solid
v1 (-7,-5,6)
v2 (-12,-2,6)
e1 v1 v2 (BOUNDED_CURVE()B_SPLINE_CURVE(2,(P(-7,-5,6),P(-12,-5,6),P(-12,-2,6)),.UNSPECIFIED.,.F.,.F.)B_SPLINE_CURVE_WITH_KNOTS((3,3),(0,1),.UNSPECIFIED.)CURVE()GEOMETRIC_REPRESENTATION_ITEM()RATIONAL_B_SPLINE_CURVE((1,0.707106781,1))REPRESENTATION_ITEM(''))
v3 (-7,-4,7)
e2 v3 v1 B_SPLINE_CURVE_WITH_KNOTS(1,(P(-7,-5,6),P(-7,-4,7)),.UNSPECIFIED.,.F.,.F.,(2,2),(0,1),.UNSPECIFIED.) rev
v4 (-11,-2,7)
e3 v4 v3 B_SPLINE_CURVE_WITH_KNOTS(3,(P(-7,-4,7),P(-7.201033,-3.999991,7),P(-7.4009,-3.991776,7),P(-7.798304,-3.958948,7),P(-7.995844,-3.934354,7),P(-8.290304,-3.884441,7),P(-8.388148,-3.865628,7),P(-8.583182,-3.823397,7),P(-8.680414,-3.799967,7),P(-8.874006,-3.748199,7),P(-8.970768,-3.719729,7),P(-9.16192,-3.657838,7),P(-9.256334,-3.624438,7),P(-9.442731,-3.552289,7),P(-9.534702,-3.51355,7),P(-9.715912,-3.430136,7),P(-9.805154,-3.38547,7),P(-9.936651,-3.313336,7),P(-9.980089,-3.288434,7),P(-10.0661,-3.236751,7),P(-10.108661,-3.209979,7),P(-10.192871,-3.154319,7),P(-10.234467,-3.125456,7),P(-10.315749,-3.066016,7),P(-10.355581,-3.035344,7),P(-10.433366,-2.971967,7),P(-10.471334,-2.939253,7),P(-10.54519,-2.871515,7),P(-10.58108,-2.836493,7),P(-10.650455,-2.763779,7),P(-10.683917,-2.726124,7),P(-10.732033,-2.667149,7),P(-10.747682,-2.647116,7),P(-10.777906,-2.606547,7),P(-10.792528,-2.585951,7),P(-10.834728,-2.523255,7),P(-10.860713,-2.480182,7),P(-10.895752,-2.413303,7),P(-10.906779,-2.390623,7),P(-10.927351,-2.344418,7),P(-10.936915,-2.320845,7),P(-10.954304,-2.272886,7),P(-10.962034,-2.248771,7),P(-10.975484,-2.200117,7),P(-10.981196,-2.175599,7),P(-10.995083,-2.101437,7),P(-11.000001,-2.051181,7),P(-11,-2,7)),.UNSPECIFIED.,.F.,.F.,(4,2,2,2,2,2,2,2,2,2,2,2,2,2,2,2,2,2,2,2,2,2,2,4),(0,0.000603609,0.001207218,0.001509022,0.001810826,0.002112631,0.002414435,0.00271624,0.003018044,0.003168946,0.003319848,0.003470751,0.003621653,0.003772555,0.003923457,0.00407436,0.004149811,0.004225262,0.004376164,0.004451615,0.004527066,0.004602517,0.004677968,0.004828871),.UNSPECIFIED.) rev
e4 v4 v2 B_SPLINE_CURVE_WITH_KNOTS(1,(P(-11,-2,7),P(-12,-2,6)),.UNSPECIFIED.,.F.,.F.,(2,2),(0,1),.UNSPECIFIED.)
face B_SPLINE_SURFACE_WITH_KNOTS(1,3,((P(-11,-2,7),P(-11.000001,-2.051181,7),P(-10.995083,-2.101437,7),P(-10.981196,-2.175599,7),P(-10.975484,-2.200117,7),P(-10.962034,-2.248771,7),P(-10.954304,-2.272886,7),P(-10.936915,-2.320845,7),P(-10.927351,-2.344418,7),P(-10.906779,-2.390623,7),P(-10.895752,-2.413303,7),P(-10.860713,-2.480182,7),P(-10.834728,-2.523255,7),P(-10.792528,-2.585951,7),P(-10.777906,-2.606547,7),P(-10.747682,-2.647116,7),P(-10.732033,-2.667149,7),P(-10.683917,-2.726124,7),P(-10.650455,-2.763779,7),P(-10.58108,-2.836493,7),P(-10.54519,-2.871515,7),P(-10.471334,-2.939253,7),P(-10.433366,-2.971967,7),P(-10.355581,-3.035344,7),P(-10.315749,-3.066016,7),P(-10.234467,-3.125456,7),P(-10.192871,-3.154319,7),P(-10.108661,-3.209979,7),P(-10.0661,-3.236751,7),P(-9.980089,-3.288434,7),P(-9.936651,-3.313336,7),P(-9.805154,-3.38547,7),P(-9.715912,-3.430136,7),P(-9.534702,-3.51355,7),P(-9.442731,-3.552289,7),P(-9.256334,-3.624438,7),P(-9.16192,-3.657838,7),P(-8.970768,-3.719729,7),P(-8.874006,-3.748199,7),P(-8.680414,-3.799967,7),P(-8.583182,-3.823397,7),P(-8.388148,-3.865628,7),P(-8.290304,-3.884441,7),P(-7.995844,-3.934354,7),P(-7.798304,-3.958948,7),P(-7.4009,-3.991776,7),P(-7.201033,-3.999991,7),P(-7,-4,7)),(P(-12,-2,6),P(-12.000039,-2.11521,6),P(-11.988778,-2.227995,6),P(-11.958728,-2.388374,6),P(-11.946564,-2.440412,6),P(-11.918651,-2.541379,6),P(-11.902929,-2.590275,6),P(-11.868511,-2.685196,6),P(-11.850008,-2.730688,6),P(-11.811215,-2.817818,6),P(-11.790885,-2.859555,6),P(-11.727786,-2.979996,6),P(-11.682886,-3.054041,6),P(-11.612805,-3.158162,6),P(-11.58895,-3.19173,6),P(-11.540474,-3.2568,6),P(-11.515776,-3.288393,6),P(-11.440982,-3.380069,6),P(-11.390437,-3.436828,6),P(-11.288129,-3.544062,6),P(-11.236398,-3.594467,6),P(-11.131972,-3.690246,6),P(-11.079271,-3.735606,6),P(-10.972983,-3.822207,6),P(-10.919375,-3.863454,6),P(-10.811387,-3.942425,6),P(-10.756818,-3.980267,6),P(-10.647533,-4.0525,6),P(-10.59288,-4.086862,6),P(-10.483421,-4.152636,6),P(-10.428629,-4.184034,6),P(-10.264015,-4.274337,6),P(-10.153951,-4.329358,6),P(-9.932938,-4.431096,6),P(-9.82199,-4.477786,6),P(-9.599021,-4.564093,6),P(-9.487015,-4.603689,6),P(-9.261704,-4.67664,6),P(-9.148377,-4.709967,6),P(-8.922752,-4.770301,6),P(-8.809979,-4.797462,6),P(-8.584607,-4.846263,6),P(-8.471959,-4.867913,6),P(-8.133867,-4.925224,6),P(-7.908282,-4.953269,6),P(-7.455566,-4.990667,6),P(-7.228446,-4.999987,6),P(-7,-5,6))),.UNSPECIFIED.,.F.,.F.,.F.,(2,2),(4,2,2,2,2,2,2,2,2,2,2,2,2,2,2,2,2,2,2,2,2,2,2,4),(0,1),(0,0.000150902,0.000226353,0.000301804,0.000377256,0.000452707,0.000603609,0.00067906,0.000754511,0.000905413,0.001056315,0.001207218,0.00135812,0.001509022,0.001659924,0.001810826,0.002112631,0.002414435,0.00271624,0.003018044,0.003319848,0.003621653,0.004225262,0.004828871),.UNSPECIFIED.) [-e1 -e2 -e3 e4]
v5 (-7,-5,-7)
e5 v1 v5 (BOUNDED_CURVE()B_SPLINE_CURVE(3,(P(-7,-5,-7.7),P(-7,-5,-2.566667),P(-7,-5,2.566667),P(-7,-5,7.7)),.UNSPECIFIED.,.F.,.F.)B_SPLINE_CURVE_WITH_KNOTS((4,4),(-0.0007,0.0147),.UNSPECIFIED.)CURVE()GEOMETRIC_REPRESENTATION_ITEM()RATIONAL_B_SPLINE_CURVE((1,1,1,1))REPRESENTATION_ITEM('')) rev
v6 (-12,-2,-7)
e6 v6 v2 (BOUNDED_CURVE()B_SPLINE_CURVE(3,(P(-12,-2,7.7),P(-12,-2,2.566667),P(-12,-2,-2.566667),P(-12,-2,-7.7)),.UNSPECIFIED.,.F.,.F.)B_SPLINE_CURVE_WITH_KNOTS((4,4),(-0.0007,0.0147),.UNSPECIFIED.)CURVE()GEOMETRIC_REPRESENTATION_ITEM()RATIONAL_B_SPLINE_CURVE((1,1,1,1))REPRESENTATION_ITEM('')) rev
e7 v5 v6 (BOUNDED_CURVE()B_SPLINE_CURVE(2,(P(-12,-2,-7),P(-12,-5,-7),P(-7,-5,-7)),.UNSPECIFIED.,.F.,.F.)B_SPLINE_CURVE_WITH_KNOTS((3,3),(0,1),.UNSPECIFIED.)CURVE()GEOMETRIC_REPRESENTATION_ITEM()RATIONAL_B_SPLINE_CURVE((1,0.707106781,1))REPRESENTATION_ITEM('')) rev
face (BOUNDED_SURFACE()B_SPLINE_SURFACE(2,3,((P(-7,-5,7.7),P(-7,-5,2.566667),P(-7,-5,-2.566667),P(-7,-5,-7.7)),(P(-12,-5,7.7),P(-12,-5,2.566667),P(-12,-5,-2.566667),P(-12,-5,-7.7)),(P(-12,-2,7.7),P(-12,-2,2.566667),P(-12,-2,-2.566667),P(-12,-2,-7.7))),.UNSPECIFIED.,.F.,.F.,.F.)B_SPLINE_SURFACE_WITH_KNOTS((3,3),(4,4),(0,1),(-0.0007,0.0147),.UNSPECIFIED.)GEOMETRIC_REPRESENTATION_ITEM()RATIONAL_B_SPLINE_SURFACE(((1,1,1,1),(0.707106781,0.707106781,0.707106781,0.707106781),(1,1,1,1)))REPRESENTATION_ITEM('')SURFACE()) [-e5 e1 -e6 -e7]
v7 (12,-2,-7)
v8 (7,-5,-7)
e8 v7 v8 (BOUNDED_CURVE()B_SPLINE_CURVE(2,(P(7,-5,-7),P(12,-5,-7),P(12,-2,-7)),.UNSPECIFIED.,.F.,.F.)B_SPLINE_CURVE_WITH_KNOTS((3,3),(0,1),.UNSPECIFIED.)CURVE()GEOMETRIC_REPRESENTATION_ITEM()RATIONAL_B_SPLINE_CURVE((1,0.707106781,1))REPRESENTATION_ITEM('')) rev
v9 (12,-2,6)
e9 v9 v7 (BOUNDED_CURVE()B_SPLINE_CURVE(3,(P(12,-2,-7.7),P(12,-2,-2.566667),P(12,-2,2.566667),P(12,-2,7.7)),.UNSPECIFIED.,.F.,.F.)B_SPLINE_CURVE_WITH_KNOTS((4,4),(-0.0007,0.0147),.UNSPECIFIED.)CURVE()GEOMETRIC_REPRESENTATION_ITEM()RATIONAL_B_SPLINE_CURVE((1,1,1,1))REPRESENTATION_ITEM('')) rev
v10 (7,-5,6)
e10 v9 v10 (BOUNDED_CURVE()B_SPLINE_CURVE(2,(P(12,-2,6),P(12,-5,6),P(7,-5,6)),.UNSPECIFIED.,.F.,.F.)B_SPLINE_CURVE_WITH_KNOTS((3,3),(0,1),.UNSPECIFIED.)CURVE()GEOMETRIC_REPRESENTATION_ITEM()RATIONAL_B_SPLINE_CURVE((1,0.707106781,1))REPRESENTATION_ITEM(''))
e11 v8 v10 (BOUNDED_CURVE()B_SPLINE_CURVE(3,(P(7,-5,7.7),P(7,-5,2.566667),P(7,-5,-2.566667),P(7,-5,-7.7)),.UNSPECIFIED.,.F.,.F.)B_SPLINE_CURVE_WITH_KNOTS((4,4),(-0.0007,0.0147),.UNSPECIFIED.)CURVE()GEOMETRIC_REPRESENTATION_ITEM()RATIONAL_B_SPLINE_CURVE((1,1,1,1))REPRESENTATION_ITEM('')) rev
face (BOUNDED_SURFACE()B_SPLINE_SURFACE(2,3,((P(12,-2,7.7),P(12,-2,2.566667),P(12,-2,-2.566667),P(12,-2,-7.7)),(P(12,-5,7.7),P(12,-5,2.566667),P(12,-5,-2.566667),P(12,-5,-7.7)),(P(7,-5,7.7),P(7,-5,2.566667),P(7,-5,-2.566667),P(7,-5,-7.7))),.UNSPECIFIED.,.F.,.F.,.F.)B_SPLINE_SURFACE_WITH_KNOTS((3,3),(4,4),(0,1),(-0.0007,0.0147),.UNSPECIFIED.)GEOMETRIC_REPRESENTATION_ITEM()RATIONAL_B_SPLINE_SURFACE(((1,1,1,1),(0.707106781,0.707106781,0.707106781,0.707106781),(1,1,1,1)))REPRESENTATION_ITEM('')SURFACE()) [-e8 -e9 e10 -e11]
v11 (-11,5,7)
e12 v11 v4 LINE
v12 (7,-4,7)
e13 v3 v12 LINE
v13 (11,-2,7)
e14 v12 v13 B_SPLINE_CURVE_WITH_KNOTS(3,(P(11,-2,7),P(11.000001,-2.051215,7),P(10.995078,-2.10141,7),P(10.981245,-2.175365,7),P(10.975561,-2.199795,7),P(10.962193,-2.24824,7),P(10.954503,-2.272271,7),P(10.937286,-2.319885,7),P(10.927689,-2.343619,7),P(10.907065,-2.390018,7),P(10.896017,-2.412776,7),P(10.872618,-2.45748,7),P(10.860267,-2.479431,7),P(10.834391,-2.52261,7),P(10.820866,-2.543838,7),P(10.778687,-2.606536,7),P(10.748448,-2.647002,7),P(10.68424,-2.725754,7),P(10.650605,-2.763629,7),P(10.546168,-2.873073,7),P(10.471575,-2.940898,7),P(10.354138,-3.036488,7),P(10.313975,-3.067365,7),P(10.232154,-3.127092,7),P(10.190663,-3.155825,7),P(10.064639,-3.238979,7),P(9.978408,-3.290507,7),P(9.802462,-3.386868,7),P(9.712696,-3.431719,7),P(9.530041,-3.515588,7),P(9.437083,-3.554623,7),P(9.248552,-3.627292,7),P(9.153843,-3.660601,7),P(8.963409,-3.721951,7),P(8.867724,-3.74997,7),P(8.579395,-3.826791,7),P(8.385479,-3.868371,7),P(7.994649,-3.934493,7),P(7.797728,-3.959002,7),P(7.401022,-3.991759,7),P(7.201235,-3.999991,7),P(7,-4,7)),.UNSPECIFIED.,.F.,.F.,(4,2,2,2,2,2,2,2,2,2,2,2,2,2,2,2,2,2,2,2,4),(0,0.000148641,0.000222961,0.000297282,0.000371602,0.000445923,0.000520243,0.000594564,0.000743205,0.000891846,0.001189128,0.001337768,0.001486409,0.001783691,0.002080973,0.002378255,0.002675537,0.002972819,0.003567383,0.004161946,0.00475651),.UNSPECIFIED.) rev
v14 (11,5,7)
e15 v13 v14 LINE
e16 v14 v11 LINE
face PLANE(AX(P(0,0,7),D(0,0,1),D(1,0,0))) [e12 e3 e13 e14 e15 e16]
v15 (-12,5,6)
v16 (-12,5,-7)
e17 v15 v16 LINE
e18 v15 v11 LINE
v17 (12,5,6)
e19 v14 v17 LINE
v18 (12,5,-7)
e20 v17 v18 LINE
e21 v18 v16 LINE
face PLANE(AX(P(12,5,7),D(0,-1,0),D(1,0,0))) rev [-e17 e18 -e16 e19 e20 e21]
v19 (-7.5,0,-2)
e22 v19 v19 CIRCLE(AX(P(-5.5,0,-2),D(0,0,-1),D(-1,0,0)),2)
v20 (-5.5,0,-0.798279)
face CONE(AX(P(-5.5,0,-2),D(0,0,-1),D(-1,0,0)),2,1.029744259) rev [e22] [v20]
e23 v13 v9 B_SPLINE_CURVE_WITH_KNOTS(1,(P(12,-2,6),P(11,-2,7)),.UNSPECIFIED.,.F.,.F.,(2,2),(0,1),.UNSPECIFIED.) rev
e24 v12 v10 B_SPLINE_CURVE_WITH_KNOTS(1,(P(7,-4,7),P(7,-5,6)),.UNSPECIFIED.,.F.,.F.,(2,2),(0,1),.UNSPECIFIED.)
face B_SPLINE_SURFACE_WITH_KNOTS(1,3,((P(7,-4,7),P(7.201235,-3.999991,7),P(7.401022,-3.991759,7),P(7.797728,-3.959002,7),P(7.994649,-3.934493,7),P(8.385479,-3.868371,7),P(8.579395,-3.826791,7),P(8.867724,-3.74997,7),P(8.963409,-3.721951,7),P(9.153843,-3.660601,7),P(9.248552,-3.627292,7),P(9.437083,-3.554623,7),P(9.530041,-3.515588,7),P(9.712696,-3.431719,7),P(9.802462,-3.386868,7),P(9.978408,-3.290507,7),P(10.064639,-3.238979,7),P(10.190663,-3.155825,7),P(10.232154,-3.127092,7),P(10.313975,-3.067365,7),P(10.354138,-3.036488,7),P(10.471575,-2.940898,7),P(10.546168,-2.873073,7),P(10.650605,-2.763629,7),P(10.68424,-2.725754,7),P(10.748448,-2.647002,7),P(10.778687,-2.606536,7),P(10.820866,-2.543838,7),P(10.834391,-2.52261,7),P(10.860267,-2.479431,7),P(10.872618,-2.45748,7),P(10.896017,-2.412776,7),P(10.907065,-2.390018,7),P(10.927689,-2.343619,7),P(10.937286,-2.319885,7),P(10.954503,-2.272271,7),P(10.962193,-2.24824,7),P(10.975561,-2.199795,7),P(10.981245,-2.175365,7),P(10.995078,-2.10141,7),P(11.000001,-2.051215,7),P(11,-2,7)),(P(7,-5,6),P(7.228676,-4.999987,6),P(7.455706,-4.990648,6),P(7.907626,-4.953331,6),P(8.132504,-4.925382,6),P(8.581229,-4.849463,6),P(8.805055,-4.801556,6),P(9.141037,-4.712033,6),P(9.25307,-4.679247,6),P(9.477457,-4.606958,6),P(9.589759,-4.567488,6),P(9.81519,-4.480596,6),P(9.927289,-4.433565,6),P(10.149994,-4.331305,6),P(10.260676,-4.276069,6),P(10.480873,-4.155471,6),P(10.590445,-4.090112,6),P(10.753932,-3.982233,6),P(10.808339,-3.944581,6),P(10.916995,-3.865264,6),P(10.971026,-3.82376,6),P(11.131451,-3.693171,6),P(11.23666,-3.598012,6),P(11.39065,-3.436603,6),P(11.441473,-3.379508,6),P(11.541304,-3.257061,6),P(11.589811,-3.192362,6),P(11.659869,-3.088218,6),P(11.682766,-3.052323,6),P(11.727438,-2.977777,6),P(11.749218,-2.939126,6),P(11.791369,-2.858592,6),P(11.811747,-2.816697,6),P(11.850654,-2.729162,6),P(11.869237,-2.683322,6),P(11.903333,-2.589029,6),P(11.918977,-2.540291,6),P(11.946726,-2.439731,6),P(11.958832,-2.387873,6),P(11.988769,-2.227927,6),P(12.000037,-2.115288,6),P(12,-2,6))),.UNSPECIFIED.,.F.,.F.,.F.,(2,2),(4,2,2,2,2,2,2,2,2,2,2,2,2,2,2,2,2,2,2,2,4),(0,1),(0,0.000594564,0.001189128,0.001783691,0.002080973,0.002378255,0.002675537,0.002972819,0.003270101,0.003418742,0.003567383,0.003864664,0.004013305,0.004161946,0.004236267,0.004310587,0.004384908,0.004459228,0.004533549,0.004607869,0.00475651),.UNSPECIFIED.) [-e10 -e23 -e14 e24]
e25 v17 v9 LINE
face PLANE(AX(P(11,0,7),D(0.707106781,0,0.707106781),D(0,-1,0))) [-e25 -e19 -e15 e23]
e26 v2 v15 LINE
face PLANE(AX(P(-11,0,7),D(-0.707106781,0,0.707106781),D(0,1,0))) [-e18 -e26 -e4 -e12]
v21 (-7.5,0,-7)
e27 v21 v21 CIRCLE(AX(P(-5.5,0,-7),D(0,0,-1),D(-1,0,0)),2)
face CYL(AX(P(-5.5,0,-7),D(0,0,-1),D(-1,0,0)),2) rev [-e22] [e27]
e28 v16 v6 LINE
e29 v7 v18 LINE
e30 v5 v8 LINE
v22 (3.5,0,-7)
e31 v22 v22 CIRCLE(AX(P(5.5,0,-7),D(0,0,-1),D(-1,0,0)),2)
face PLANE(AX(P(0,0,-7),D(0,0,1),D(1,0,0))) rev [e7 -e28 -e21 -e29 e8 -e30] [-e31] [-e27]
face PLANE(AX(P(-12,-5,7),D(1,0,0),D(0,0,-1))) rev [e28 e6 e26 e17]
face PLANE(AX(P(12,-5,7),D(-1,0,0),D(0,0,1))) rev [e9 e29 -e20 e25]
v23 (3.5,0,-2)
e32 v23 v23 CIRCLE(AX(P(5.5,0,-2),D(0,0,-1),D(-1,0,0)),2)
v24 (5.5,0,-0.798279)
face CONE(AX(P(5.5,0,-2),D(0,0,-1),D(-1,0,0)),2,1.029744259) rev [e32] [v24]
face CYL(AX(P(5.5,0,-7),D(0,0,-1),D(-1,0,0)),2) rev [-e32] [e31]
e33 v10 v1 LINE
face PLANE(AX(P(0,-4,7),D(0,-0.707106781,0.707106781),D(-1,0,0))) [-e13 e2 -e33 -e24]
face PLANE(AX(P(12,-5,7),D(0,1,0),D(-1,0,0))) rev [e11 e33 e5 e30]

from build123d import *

# Parameters (mm, degrees)
SKIZZE1_W                          = 24
SKIZZE1_H                          = 10
AUFSATZ_LINEAR_AUSTRAGEN1_DEPTH    = 7
F_4_0_4_DURCHMESSER_BOHRUNG1_D     = 4
F_4_0_4_DURCHMESSER_BOHRUNG1_DEPTH = 5
F_4_0_4_DURCHMESSER_BOHRUNG1_TIP   = 1.201721238
VERRUNDUNG1_SIZE                   = 5
VERRUNDUNG1_SIZE_2                 = 3
FASE2_SIZE                         = 1


with BuildPart() as part:
    # Skizze1 → Aufsatz-Linear austragen1 (new, symmetric)
    with BuildSketch(Plane.XY):
        Rectangle(SKIZZE1_W, SKIZZE1_H)
    extrude(amount=AUFSATZ_LINEAR_AUSTRAGEN1_DEPTH, both=True)

    # Ø4.0 (4) Durchmesser Bohrung1
    with Locations(Plane(origin=(0, 0, -7), x_dir=(-1, 0, 0), z_dir=(0, 0, -1))):
        with Locations((-5.5, 0), (5.5, 0)):
            Hole(F_4_0_4_DURCHMESSER_BOHRUNG1_D / 2, depth=F_4_0_4_DURCHMESSER_BOHRUNG1_DEPTH)
            with Locations((0, 0, -(F_4_0_4_DURCHMESSER_BOHRUNG1_DEPTH + F_4_0_4_DURCHMESSER_BOHRUNG1_TIP / 2))):  # 118° drill point
                Cone(0, F_4_0_4_DURCHMESSER_BOHRUNG1_D / 2, F_4_0_4_DURCHMESSER_BOHRUNG1_TIP, mode=Mode.SUBTRACT)

    # Verrundung1
    # an asymmetric fillet: 5, 3 mm, written as the material it takes off along each edge
    with BuildSketch(Plane(origin=(12, -5, -19.5), x_dir=(-1, 0, 0), z_dir=(0, 0, 1)), Plane(origin=(-12, -5, 19.5), x_dir=(1, 0, 0), z_dir=(0, 0, -1))) as verrundung1_piece_1:
        with BuildLine():
            Bezier((VERRUNDUNG1_SIZE, 0), (0, 0), (0, -VERRUNDUNG1_SIZE_2), weights=[1, 0.707106781, 1])
            Line((0, -VERRUNDUNG1_SIZE_2), (0, 0))
            Line((0, 0), (VERRUNDUNG1_SIZE, 0))
        make_face()
    extrude(amount=39, mode=Mode.SUBTRACT)

    # Fase2
    fase2_edges = [part.edges().sort_by_distance(p)[0] for p in [
        (12, 1.5, 7),
        (10.099176713, -4.354195674, 7),
        (0, -5, 7),
        (-10.099176713, -4.354195674, 7),
        (-12, 1.5, 7),
    ]]
    chamfer(fase2_edges, length=FASE2_SIZE)


solid = part.part
